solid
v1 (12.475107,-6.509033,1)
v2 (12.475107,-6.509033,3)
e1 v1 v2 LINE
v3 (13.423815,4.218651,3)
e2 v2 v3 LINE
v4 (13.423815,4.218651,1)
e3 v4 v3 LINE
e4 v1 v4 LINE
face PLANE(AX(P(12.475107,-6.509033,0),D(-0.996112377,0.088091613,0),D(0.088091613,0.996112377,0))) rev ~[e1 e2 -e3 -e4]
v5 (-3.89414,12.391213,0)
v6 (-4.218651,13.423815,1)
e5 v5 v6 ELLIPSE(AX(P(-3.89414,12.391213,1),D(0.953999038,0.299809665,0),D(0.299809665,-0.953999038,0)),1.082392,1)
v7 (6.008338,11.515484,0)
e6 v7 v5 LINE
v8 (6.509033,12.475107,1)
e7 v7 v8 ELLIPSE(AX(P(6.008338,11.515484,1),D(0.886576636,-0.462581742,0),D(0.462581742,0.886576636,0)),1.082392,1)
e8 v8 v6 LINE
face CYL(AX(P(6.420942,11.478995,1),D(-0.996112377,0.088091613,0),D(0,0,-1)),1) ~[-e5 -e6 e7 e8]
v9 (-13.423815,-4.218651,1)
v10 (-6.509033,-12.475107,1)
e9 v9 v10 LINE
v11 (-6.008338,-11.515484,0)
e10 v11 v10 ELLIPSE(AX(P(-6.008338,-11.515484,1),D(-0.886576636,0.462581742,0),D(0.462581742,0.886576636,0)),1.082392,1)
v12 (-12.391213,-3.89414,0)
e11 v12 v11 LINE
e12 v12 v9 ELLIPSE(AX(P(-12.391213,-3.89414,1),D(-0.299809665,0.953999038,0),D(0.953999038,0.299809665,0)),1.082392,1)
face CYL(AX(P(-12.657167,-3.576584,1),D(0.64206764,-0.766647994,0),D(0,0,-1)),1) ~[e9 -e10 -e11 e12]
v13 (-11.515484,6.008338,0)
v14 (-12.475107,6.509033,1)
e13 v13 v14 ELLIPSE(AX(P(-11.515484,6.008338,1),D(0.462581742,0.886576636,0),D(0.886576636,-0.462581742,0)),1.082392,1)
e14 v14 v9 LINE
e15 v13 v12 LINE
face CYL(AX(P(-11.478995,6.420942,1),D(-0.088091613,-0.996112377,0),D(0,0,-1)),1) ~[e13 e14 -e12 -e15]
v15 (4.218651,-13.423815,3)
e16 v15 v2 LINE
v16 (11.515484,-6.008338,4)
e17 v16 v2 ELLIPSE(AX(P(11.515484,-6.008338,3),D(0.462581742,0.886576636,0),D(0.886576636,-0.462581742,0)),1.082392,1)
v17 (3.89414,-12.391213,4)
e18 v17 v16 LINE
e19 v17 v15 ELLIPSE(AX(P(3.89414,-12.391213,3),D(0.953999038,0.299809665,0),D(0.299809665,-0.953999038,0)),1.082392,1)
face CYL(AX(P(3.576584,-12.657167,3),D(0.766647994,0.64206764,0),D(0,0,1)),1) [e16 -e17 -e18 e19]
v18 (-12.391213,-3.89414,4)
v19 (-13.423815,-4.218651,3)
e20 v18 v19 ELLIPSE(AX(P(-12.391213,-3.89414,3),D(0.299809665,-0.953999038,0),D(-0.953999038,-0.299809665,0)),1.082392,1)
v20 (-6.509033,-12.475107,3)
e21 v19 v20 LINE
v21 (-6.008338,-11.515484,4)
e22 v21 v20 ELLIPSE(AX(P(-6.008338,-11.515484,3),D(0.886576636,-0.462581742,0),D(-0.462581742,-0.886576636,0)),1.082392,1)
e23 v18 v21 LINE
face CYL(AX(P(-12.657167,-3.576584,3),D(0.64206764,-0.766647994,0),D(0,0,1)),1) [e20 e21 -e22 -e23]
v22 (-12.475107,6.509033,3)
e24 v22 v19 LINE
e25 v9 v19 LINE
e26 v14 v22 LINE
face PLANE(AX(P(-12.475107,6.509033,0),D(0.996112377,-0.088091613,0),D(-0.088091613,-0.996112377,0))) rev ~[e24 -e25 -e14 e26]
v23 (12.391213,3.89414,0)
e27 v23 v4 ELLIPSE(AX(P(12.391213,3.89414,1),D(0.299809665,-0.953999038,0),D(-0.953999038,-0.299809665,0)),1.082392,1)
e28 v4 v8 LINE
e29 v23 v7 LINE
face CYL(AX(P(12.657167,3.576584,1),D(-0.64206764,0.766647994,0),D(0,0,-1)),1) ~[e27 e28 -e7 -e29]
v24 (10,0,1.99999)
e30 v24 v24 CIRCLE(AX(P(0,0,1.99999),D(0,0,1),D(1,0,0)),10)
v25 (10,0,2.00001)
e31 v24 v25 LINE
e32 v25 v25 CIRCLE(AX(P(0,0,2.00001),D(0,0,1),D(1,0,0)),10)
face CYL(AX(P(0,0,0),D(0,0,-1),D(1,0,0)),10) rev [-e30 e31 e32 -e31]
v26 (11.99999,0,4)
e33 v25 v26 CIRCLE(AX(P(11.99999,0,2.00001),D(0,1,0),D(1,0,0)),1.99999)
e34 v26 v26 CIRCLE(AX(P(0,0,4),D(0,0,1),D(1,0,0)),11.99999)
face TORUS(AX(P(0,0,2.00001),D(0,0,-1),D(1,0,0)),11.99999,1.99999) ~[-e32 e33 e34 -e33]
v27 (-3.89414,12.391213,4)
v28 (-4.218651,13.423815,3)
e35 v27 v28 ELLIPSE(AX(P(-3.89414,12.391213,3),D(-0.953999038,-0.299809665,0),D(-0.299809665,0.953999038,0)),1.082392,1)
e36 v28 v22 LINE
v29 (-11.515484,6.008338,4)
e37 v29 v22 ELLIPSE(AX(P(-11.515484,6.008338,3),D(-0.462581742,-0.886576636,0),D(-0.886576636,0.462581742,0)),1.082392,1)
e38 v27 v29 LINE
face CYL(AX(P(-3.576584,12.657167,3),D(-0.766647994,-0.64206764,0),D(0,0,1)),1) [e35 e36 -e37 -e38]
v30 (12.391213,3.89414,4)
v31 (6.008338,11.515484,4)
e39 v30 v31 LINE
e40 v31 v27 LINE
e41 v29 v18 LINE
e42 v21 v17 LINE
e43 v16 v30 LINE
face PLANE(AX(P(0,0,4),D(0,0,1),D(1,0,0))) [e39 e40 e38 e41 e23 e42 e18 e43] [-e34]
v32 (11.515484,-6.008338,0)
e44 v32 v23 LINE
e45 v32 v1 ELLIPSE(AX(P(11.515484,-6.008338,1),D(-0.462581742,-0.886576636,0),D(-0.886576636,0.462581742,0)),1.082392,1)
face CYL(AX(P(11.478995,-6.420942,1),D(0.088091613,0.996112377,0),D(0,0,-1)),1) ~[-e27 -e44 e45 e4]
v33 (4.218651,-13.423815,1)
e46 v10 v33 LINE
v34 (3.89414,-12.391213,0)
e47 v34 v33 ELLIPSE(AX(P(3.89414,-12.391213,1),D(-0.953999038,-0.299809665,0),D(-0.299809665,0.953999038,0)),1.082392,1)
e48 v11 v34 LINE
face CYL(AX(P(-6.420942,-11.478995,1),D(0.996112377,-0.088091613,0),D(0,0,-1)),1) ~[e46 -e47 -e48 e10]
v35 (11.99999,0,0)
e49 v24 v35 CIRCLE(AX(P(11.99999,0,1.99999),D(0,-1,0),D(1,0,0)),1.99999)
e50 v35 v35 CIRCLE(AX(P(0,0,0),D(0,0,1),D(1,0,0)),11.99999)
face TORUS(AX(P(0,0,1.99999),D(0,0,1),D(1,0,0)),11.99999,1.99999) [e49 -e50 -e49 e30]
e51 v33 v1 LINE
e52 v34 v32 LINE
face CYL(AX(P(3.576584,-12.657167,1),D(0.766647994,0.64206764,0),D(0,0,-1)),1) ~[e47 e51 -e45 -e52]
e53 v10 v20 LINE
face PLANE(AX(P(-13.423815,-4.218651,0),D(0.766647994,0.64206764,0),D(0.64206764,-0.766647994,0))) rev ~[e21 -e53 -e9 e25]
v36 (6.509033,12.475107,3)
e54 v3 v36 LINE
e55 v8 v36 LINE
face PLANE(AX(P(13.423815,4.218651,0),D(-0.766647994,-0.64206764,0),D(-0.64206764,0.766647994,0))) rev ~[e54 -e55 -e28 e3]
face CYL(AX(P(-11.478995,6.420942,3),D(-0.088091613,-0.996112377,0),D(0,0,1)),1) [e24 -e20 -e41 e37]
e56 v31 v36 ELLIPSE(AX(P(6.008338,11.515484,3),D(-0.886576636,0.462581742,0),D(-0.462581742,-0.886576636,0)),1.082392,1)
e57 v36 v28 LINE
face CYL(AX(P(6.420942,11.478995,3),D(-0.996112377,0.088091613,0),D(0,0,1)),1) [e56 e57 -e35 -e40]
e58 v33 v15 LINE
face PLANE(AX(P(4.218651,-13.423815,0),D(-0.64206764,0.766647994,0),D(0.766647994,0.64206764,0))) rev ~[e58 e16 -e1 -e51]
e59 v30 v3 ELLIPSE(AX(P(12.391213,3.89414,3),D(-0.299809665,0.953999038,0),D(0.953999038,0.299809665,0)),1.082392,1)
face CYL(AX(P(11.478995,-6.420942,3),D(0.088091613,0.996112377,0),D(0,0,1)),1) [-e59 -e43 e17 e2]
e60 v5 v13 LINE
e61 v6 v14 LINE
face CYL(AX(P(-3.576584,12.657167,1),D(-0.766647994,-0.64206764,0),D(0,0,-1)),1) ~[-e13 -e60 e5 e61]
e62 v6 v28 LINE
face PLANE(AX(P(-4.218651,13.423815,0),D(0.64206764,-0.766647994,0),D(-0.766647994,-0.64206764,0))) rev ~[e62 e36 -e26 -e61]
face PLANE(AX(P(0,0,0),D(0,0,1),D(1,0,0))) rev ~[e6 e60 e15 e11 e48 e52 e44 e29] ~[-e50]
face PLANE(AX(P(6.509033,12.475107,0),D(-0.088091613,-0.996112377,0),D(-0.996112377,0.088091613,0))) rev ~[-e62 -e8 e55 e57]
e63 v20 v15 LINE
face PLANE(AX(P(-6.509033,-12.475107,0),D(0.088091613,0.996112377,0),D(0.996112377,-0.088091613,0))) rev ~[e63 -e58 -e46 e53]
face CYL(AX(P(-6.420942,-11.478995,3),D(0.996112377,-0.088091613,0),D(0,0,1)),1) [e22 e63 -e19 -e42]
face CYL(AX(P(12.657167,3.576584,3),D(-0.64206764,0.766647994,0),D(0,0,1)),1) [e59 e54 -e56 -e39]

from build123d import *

# Parameters (mm, degrees)
F0_R     = 10
F1_DEPTH = 4
F2_R     = 1.99999
F3_R     = 1


# Not quite as in the source:
# - a fillet or chamfer is up to 0.001 mm smaller than in the source, because OpenCascade refuses the exact size


with BuildPart() as f1:
    # F0 (on Top) → F1 (new body)
    with BuildSketch(Plane.XY):
        Polygon((4.2186513593, -13.4238145334), (12.4751072696, -6.5090333023), (13.4238145334, 4.2186513593), (6.5090333023, 12.4751072696), (-4.2186513593, 13.4238145334), (-12.4751072696, 6.5090333023), (-13.4238145334, -4.2186513593), (-6.5090333023, -12.4751072696), align=None)
        Circle(F0_R, mode=Mode.SUBTRACT)
    extrude(amount=F1_DEPTH)

    # F2 (radius 2 in the source; OpenCascade refuses exactly that, so slightly less here)
    f2_edges = [f1.edges().sort_by_distance(p)[0] for p in [
        (-10, 0, 0),
        (-10, 0, 4),
    ]]
    fillet(f2_edges, radius=F2_R)

    # F3
    f3_edges = [f1.edges().sort_by_distance(p)[0] for p in [
        (1.145191, 12.949461, 4),
        (-8.346879, 9.966424, 4),
        (-12.949461, 1.145191, 4),
        (-9.966424, -8.346879, 4),
        (-1.145191, -12.949461, 4),
        (8.346879, -9.966424, 4),
        (12.949461, -1.145191, 4),
        (9.966424, 8.346879, 4),
        (9.966424, 8.346879, 0),
        (12.949461, -1.145191, 0),
        (8.346879, -9.966424, 0),
        (-1.145191, -12.949461, 0),
        (-9.966424, -8.346879, 0),
        (-12.949461, 1.145191, 0),
        (-8.346879, 9.966424, 0),
        (1.145191, 12.949461, 0),
    ]]
    fillet(f3_edges, radius=F3_R)


solid = f1.part
